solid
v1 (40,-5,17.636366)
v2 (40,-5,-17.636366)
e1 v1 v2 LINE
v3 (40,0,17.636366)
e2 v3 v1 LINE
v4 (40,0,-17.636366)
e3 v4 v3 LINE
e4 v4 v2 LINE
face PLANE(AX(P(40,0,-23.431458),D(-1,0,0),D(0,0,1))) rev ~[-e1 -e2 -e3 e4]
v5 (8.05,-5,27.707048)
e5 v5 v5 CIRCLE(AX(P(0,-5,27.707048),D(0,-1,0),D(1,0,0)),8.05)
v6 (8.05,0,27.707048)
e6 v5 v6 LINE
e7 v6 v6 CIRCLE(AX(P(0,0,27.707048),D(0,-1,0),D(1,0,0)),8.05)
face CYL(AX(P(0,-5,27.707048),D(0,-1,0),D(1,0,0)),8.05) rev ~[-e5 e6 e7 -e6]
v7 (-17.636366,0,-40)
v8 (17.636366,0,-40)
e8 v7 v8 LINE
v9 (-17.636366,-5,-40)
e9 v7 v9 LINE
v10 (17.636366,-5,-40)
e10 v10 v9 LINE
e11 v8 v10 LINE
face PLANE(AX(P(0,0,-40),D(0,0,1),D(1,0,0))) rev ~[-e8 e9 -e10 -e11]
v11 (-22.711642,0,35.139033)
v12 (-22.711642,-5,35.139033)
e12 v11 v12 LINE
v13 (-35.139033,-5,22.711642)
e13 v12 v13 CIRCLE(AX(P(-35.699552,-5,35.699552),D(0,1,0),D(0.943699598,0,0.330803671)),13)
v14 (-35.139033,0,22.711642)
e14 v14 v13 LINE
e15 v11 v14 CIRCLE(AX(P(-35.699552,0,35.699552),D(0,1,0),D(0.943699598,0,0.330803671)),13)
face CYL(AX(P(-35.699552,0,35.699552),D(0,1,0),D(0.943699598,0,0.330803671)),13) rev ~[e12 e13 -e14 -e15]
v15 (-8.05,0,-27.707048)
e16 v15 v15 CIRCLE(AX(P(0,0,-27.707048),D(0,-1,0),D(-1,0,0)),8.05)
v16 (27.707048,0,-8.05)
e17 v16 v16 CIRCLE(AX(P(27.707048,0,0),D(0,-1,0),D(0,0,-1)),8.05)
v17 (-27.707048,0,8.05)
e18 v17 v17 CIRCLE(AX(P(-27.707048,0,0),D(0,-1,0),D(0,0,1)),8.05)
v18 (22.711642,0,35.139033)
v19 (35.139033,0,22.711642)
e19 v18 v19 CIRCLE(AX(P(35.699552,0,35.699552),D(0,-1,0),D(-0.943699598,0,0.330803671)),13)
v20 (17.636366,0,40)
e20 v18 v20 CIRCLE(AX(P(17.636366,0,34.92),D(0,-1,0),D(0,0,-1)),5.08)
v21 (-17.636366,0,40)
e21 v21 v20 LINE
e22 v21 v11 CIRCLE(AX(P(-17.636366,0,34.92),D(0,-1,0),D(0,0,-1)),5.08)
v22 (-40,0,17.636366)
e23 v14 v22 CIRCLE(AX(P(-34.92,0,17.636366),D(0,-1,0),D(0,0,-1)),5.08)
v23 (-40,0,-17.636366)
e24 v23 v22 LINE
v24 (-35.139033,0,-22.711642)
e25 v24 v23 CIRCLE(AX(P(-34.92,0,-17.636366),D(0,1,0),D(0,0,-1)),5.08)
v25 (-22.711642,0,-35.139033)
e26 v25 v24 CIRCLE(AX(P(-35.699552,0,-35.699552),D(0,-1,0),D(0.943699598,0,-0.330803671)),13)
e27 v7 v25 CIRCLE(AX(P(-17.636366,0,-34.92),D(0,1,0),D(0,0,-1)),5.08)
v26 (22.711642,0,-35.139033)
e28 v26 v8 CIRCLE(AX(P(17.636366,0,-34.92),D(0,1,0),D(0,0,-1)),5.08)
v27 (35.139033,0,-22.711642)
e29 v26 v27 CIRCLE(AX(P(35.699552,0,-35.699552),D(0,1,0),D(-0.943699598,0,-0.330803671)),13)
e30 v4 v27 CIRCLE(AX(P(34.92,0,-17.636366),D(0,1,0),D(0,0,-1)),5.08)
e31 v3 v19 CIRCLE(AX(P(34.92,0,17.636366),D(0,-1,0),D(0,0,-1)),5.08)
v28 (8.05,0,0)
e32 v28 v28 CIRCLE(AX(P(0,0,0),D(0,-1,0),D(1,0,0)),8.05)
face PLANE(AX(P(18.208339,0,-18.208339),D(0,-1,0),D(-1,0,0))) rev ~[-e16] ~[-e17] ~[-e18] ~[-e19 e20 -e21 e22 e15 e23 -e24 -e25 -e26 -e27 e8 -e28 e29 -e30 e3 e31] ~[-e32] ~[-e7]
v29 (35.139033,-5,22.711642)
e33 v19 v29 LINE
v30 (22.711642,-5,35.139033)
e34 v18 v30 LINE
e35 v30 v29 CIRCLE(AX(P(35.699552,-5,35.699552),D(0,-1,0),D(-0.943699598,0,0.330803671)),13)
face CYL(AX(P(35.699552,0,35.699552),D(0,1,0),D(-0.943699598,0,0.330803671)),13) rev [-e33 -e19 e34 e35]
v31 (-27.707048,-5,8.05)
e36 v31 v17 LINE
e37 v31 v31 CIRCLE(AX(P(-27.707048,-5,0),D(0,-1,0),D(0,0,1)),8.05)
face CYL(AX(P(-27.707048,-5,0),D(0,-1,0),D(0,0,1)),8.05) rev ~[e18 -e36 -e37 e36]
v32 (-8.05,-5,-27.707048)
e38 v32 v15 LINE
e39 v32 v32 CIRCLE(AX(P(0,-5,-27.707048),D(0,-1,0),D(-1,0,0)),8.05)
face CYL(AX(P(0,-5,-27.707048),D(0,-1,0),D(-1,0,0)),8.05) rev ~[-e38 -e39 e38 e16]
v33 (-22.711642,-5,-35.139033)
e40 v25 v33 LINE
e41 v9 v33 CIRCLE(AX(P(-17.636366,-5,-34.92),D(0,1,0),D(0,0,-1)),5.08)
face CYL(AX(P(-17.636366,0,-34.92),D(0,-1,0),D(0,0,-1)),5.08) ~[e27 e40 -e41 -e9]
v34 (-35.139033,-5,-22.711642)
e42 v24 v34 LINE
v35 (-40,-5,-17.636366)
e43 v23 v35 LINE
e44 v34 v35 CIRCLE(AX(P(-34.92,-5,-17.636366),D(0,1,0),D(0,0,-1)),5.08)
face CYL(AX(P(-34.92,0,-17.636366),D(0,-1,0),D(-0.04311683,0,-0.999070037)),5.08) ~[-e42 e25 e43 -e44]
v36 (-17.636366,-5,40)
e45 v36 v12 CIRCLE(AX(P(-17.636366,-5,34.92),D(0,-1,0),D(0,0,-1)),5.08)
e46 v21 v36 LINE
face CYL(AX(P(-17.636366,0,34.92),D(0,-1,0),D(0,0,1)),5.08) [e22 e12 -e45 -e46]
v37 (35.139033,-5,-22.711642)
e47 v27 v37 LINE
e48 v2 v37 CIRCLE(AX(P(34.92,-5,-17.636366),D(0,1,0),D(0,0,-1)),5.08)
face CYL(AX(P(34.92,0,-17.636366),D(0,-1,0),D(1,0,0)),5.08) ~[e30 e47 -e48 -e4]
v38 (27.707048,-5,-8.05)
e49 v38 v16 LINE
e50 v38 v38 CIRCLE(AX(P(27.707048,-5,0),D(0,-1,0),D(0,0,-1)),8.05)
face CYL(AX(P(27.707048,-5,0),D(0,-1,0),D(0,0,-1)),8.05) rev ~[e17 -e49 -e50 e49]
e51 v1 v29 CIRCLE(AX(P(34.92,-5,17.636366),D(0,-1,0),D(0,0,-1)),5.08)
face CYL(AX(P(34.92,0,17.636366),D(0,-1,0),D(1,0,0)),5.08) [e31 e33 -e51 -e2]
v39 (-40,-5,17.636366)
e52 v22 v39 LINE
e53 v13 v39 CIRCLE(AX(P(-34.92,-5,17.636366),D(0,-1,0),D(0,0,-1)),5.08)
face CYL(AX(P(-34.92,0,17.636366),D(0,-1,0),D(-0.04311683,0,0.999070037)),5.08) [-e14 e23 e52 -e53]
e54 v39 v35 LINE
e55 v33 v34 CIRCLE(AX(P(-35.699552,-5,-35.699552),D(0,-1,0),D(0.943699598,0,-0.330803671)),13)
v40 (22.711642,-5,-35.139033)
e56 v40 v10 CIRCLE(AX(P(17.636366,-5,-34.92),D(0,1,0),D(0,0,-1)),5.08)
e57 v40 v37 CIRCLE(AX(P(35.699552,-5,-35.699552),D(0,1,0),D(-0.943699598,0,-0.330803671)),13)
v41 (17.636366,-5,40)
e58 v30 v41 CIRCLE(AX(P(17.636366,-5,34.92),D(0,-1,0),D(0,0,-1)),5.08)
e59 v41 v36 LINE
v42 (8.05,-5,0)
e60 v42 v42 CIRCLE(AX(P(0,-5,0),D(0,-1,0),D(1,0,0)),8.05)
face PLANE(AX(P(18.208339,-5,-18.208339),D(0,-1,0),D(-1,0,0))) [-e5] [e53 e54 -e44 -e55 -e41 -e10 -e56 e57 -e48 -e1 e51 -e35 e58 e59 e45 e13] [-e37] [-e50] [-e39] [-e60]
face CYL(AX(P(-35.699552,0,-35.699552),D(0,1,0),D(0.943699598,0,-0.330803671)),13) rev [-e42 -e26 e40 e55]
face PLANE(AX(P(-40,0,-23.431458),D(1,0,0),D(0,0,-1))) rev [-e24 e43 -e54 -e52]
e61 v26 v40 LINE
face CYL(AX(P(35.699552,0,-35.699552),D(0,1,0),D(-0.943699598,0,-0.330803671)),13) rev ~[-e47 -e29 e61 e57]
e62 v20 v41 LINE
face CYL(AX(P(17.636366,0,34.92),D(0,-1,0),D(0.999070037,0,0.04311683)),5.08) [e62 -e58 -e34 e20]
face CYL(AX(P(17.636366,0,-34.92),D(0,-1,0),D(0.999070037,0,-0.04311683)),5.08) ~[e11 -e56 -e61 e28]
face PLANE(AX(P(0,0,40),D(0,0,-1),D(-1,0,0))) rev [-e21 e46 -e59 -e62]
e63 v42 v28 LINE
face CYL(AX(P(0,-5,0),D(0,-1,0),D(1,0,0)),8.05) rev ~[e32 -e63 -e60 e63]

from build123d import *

# Parameters (mm, degrees)
F1_DEPTH        = 5
F4_R            = 8.05
F5_DEPTH        = 5.001
F6_R            = 5.08
F7_R            = 8.05
F8_DEPTH        = 5.001
F8_COPIES_COUNT = 4


# Not quite as in the source:
# - a pattern or mirror of a feature is missing from the dataset's text; its kind, count and spacing are read off the source's solid


with BuildPart() as f1:
    # F0 (on Front) → F1 (new body)
    with BuildSketch(Plane.XZ):
        with BuildLine():
            Line((-40, 23.4314575051), (-40, 0))
            Line((-40, 0), (0, 0))
            Line((0, 0), (0, 40))
            Line((0, 40), (-23.4314575051, 40))
            ThreePointArc((-23.4314575051, 40), (-26.5071641246, 26.5071641246), (-40, 23.4314575051))
        make_face()
    extrude(amount=F1_DEPTH)

    # F2: F1 across face


with BuildPart() as f1_1:
    add(f1.part)
    add(f1.part.mirror(Plane(origin=(0, -2.5, 20), x_dir=(0, 1, 0), z_dir=(1, 0, 0))))

    # F3: F1 across face


with BuildPart() as f1_2:
    add(f1_1.part)
    add(f1_1.part.mirror(Plane(origin=(0, -2.5, 0), x_dir=(1, 0, 0), z_dir=(0, 0, -1))))

    # F4 (on face) → F5 (cut, through all)
    with BuildSketch(Plane.XZ.offset(5)):
        Circle(F4_R)
    extrude(amount=-F5_DEPTH, mode=Mode.SUBTRACT)

    # F6
    f6_edges = [f1_2.edges().sort_by_distance(p)[0] for p in [
        (-40, -2.5, 23.431458),
        (-23.431458, -2.5, 40),
        (23.431458, -2.5, 40),
        (40, -2.5, 23.431458),
        (40, -2.5, -23.431458),
        (23.431458, -2.5, -40),
        (-40, -2.5, -23.431458),
        (-23.431458, -2.5, -40),
    ]]
    fillet(f6_edges, radius=F6_R)

    # F7 (on face) → F8 (cut, through all)
    with BuildSketch(Plane.XZ.offset(5)):
        with Locations((0, 27.7070477605)):
            Circle(F7_R)
    f8 = extrude(amount=-F8_DEPTH, mode=Mode.SUBTRACT)

    # F8_copies: F8 ×4 about axis
    f8_copies_axis = Axis((0, 0, 0), (0, 1, 0))
    for i in range(1, F8_COPIES_COUNT):
        add(f8.rotate(f8_copies_axis, i * 360 / F8_COPIES_COUNT), mode=Mode.SUBTRACT)


solid = f1_2.part
